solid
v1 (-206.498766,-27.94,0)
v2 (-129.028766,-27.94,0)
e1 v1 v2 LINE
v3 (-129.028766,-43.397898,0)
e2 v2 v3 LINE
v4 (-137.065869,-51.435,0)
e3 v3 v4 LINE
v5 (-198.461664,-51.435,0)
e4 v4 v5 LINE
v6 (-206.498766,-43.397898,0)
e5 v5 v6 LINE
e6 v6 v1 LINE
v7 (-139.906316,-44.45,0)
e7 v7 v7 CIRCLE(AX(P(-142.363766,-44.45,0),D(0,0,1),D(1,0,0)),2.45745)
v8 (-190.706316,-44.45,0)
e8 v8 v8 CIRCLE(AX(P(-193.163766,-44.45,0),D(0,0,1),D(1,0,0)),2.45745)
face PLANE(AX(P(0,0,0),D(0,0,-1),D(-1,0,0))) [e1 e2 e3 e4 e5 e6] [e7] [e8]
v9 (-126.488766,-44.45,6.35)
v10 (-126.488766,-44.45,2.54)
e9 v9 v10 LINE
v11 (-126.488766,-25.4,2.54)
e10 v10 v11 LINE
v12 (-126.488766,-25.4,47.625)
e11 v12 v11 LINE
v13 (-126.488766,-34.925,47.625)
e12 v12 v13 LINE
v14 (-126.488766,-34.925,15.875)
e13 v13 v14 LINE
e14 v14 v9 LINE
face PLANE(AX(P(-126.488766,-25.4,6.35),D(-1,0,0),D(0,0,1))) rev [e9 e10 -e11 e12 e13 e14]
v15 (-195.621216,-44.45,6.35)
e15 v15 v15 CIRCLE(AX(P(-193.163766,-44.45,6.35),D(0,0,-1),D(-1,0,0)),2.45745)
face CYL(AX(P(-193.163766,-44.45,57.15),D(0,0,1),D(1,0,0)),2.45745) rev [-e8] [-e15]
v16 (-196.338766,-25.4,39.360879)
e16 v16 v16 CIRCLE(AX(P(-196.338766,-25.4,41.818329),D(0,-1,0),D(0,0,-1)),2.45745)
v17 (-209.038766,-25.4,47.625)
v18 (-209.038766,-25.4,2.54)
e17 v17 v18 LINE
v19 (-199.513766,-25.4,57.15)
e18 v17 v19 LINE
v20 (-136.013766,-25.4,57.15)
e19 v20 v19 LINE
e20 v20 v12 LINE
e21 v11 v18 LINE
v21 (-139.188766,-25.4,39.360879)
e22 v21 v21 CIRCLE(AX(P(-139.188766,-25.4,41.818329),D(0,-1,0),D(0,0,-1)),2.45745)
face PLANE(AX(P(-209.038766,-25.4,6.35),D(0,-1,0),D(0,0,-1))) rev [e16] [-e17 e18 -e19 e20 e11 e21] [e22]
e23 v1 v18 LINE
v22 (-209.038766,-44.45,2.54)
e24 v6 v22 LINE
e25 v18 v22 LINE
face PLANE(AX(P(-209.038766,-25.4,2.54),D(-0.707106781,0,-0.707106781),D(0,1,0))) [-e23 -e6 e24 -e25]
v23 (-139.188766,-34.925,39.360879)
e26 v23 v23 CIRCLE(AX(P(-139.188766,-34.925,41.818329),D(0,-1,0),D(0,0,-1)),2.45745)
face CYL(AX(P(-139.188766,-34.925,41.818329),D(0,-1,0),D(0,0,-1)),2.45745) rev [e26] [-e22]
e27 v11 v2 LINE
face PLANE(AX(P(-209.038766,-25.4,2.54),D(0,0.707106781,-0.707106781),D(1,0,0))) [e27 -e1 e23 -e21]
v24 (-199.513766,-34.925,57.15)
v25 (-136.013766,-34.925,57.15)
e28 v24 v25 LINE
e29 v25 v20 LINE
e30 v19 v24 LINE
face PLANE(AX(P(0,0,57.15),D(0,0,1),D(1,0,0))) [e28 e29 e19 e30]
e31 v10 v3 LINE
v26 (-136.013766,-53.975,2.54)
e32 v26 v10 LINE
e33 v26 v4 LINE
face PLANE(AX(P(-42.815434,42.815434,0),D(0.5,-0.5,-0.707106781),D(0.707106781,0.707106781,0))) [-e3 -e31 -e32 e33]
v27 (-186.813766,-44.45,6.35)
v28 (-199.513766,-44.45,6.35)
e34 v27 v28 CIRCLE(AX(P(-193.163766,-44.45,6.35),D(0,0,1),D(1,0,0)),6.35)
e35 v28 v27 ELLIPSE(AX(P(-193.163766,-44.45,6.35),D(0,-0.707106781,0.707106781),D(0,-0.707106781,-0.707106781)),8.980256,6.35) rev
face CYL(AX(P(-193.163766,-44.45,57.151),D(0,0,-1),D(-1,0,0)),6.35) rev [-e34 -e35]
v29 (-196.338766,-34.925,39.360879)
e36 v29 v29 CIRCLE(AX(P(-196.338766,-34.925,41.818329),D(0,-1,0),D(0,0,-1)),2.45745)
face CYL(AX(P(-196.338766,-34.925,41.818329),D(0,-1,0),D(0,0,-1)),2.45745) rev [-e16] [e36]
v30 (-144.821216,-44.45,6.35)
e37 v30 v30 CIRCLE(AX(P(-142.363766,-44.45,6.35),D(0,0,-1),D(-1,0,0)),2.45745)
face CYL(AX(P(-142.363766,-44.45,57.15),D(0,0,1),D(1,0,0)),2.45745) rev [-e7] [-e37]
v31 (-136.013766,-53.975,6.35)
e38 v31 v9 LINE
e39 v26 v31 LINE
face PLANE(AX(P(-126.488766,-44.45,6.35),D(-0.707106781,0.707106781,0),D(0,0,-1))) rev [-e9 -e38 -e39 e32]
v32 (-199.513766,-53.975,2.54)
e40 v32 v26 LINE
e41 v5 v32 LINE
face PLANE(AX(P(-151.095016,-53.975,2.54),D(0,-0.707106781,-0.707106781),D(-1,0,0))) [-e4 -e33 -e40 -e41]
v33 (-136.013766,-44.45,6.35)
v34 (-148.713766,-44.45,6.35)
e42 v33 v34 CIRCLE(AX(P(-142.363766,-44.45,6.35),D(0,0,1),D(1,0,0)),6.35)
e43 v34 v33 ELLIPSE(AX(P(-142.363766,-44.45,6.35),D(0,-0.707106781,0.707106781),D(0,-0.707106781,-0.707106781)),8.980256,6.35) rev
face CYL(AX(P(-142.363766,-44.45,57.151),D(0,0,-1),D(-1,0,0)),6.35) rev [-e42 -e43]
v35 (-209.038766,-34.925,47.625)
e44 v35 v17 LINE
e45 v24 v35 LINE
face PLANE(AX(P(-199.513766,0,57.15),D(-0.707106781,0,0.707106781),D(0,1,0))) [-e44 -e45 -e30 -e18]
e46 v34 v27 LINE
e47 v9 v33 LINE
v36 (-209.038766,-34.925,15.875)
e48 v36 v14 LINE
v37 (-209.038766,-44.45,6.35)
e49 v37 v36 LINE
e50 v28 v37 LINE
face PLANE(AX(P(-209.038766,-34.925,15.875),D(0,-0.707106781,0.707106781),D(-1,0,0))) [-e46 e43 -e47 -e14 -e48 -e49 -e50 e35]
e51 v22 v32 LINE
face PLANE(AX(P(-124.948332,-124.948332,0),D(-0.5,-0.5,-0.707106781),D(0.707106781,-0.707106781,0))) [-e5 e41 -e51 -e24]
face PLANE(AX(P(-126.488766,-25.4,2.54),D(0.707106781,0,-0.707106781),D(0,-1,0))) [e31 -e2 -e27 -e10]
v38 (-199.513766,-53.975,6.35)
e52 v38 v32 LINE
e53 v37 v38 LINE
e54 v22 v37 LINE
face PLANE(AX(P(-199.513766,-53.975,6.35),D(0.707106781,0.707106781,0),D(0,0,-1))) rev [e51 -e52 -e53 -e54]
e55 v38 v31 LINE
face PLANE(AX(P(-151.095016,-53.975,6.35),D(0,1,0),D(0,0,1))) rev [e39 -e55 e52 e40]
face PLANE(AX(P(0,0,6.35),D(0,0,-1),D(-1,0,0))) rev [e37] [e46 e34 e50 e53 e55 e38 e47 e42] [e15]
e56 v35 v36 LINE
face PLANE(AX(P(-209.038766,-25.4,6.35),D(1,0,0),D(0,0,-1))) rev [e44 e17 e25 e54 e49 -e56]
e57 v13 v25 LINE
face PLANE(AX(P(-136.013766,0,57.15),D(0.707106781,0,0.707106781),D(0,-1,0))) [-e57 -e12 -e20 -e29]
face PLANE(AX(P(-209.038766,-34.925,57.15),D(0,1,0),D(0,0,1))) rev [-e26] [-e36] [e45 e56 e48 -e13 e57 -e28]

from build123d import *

# Parameters (mm, degrees)
BOSS_EXTRUDE1_DEPTH   = 6.35
SKETCH2_W             = 82.55
SKETCH2_H             = 9.525
BOSS_EXTRUDE2_DEPTH   = 50.8
CHAMFER1_SIZE         = 9.525
F_8_CLEARANCE_HOLE1_D = 4.9149
CUT_EXTRUDE1_REACH    = 223.791
SKETCH5_R             = 6.35
F_8_CLEARANCE_HOLE2_D = 4.9149
CHAMFER2_SIZE         = 2.54


with BuildPart() as part:
    # Sketch1 → Boss-Extrude1 (new body)
    with BuildSketch(Plane.XY):
        Polygon((-151.095016336, -53.975), (-126.488766336, -53.975), (-126.488766336, -25.4), (-209.038766336, -25.4), (-209.038766336, -53.975), align=None)
    extrude(amount=BOSS_EXTRUDE1_DEPTH)

    # Sketch2 → Boss-Extrude2 (add)
    with BuildSketch(Plane.XY.offset(6.35)):
        with Locations((-167.763766336, -30.1625)):
            Rectangle(SKETCH2_W, SKETCH2_H)
    extrude(amount=BOSS_EXTRUDE2_DEPTH)

    # Chamfer1
    chamfer1_edges = [part.edges().sort_by_distance(p)[0] for p in [
        (-167.763766336, -34.925, 6.35),
        (-126.488766336, -53.975, 3.175),
        (-126.488766336, -30.1625, 57.15),
        (-209.038766336, -30.1625, 57.15),
        (-209.038766336, -53.975, 3.175),
    ]]
    chamfer(chamfer1_edges, length=CHAMFER1_SIZE - 0.0001)  # a hair under: the kernel refuses the full size

    # #8 Clearance Hole1 (through all)
    with Locations(Plane.XY.offset(57.15)):
        with Locations((-193.163766336, -44.45), (-142.363766336, -44.45)):
            Hole(F_8_CLEARANCE_HOLE1_D / 2)

    # Sketch5 → Cut-Extrude1 (cut, up to next)
    with BuildSketch(Plane.XY.offset(6.35), mode=Mode.PRIVATE) as cut_extrude1_sk1:
        with Locations((-193.163766336, -44.45)):
            Circle(SKETCH5_R)
    cut_extrude1_tool1 = extrude(cut_extrude1_sk1.sketch, amount=CUT_EXTRUDE1_REACH, mode=Mode.PRIVATE) & part.part
    # Sketch5 → Cut-Extrude1 (cut, up to next)
    with BuildSketch(Plane.XY.offset(6.35), mode=Mode.PRIVATE) as cut_extrude1_sk2:
        with Locations((-142.363766336, -44.45)):
            Circle(SKETCH5_R)
    cut_extrude1_tool2 = extrude(cut_extrude1_sk2.sketch, amount=CUT_EXTRUDE1_REACH, mode=Mode.PRIVATE) & part.part
    add(cut_extrude1_tool1.solids().sort_by_distance((-193.163766, -44.45, 6.35))[0], mode=Mode.SUBTRACT)
    add(cut_extrude1_tool2.solids().sort_by_distance((-142.363766, -44.45, 6.35))[0], mode=Mode.SUBTRACT)

    # #8 Clearance Hole2 (through all)
    with Locations(Plane(origin=(0, -34.925, 0), x_dir=(-1, 0, 0), z_dir=(0, -1, 0))):
        with Locations((196.338766336, -41.818328597), (139.188766336, -41.818328597)):
            Hole(F_8_CLEARANCE_HOLE2_D / 2)

    # Chamfer2
    chamfer2_edges = [part.edges().sort_by_distance(p)[0] for p in [
        (-126.488766336, -34.92505, 0),
        (-167.763766336, -53.975, 0),
        (-204.276316336, -49.21255, 0),
        (-131.251216336, -49.21255, 0),
        (-209.038766336, -34.92505, 0),
        (-167.763766336, -25.4, 0),
    ]]
    chamfer(chamfer2_edges, length=CHAMFER2_SIZE)


solid = part.part
